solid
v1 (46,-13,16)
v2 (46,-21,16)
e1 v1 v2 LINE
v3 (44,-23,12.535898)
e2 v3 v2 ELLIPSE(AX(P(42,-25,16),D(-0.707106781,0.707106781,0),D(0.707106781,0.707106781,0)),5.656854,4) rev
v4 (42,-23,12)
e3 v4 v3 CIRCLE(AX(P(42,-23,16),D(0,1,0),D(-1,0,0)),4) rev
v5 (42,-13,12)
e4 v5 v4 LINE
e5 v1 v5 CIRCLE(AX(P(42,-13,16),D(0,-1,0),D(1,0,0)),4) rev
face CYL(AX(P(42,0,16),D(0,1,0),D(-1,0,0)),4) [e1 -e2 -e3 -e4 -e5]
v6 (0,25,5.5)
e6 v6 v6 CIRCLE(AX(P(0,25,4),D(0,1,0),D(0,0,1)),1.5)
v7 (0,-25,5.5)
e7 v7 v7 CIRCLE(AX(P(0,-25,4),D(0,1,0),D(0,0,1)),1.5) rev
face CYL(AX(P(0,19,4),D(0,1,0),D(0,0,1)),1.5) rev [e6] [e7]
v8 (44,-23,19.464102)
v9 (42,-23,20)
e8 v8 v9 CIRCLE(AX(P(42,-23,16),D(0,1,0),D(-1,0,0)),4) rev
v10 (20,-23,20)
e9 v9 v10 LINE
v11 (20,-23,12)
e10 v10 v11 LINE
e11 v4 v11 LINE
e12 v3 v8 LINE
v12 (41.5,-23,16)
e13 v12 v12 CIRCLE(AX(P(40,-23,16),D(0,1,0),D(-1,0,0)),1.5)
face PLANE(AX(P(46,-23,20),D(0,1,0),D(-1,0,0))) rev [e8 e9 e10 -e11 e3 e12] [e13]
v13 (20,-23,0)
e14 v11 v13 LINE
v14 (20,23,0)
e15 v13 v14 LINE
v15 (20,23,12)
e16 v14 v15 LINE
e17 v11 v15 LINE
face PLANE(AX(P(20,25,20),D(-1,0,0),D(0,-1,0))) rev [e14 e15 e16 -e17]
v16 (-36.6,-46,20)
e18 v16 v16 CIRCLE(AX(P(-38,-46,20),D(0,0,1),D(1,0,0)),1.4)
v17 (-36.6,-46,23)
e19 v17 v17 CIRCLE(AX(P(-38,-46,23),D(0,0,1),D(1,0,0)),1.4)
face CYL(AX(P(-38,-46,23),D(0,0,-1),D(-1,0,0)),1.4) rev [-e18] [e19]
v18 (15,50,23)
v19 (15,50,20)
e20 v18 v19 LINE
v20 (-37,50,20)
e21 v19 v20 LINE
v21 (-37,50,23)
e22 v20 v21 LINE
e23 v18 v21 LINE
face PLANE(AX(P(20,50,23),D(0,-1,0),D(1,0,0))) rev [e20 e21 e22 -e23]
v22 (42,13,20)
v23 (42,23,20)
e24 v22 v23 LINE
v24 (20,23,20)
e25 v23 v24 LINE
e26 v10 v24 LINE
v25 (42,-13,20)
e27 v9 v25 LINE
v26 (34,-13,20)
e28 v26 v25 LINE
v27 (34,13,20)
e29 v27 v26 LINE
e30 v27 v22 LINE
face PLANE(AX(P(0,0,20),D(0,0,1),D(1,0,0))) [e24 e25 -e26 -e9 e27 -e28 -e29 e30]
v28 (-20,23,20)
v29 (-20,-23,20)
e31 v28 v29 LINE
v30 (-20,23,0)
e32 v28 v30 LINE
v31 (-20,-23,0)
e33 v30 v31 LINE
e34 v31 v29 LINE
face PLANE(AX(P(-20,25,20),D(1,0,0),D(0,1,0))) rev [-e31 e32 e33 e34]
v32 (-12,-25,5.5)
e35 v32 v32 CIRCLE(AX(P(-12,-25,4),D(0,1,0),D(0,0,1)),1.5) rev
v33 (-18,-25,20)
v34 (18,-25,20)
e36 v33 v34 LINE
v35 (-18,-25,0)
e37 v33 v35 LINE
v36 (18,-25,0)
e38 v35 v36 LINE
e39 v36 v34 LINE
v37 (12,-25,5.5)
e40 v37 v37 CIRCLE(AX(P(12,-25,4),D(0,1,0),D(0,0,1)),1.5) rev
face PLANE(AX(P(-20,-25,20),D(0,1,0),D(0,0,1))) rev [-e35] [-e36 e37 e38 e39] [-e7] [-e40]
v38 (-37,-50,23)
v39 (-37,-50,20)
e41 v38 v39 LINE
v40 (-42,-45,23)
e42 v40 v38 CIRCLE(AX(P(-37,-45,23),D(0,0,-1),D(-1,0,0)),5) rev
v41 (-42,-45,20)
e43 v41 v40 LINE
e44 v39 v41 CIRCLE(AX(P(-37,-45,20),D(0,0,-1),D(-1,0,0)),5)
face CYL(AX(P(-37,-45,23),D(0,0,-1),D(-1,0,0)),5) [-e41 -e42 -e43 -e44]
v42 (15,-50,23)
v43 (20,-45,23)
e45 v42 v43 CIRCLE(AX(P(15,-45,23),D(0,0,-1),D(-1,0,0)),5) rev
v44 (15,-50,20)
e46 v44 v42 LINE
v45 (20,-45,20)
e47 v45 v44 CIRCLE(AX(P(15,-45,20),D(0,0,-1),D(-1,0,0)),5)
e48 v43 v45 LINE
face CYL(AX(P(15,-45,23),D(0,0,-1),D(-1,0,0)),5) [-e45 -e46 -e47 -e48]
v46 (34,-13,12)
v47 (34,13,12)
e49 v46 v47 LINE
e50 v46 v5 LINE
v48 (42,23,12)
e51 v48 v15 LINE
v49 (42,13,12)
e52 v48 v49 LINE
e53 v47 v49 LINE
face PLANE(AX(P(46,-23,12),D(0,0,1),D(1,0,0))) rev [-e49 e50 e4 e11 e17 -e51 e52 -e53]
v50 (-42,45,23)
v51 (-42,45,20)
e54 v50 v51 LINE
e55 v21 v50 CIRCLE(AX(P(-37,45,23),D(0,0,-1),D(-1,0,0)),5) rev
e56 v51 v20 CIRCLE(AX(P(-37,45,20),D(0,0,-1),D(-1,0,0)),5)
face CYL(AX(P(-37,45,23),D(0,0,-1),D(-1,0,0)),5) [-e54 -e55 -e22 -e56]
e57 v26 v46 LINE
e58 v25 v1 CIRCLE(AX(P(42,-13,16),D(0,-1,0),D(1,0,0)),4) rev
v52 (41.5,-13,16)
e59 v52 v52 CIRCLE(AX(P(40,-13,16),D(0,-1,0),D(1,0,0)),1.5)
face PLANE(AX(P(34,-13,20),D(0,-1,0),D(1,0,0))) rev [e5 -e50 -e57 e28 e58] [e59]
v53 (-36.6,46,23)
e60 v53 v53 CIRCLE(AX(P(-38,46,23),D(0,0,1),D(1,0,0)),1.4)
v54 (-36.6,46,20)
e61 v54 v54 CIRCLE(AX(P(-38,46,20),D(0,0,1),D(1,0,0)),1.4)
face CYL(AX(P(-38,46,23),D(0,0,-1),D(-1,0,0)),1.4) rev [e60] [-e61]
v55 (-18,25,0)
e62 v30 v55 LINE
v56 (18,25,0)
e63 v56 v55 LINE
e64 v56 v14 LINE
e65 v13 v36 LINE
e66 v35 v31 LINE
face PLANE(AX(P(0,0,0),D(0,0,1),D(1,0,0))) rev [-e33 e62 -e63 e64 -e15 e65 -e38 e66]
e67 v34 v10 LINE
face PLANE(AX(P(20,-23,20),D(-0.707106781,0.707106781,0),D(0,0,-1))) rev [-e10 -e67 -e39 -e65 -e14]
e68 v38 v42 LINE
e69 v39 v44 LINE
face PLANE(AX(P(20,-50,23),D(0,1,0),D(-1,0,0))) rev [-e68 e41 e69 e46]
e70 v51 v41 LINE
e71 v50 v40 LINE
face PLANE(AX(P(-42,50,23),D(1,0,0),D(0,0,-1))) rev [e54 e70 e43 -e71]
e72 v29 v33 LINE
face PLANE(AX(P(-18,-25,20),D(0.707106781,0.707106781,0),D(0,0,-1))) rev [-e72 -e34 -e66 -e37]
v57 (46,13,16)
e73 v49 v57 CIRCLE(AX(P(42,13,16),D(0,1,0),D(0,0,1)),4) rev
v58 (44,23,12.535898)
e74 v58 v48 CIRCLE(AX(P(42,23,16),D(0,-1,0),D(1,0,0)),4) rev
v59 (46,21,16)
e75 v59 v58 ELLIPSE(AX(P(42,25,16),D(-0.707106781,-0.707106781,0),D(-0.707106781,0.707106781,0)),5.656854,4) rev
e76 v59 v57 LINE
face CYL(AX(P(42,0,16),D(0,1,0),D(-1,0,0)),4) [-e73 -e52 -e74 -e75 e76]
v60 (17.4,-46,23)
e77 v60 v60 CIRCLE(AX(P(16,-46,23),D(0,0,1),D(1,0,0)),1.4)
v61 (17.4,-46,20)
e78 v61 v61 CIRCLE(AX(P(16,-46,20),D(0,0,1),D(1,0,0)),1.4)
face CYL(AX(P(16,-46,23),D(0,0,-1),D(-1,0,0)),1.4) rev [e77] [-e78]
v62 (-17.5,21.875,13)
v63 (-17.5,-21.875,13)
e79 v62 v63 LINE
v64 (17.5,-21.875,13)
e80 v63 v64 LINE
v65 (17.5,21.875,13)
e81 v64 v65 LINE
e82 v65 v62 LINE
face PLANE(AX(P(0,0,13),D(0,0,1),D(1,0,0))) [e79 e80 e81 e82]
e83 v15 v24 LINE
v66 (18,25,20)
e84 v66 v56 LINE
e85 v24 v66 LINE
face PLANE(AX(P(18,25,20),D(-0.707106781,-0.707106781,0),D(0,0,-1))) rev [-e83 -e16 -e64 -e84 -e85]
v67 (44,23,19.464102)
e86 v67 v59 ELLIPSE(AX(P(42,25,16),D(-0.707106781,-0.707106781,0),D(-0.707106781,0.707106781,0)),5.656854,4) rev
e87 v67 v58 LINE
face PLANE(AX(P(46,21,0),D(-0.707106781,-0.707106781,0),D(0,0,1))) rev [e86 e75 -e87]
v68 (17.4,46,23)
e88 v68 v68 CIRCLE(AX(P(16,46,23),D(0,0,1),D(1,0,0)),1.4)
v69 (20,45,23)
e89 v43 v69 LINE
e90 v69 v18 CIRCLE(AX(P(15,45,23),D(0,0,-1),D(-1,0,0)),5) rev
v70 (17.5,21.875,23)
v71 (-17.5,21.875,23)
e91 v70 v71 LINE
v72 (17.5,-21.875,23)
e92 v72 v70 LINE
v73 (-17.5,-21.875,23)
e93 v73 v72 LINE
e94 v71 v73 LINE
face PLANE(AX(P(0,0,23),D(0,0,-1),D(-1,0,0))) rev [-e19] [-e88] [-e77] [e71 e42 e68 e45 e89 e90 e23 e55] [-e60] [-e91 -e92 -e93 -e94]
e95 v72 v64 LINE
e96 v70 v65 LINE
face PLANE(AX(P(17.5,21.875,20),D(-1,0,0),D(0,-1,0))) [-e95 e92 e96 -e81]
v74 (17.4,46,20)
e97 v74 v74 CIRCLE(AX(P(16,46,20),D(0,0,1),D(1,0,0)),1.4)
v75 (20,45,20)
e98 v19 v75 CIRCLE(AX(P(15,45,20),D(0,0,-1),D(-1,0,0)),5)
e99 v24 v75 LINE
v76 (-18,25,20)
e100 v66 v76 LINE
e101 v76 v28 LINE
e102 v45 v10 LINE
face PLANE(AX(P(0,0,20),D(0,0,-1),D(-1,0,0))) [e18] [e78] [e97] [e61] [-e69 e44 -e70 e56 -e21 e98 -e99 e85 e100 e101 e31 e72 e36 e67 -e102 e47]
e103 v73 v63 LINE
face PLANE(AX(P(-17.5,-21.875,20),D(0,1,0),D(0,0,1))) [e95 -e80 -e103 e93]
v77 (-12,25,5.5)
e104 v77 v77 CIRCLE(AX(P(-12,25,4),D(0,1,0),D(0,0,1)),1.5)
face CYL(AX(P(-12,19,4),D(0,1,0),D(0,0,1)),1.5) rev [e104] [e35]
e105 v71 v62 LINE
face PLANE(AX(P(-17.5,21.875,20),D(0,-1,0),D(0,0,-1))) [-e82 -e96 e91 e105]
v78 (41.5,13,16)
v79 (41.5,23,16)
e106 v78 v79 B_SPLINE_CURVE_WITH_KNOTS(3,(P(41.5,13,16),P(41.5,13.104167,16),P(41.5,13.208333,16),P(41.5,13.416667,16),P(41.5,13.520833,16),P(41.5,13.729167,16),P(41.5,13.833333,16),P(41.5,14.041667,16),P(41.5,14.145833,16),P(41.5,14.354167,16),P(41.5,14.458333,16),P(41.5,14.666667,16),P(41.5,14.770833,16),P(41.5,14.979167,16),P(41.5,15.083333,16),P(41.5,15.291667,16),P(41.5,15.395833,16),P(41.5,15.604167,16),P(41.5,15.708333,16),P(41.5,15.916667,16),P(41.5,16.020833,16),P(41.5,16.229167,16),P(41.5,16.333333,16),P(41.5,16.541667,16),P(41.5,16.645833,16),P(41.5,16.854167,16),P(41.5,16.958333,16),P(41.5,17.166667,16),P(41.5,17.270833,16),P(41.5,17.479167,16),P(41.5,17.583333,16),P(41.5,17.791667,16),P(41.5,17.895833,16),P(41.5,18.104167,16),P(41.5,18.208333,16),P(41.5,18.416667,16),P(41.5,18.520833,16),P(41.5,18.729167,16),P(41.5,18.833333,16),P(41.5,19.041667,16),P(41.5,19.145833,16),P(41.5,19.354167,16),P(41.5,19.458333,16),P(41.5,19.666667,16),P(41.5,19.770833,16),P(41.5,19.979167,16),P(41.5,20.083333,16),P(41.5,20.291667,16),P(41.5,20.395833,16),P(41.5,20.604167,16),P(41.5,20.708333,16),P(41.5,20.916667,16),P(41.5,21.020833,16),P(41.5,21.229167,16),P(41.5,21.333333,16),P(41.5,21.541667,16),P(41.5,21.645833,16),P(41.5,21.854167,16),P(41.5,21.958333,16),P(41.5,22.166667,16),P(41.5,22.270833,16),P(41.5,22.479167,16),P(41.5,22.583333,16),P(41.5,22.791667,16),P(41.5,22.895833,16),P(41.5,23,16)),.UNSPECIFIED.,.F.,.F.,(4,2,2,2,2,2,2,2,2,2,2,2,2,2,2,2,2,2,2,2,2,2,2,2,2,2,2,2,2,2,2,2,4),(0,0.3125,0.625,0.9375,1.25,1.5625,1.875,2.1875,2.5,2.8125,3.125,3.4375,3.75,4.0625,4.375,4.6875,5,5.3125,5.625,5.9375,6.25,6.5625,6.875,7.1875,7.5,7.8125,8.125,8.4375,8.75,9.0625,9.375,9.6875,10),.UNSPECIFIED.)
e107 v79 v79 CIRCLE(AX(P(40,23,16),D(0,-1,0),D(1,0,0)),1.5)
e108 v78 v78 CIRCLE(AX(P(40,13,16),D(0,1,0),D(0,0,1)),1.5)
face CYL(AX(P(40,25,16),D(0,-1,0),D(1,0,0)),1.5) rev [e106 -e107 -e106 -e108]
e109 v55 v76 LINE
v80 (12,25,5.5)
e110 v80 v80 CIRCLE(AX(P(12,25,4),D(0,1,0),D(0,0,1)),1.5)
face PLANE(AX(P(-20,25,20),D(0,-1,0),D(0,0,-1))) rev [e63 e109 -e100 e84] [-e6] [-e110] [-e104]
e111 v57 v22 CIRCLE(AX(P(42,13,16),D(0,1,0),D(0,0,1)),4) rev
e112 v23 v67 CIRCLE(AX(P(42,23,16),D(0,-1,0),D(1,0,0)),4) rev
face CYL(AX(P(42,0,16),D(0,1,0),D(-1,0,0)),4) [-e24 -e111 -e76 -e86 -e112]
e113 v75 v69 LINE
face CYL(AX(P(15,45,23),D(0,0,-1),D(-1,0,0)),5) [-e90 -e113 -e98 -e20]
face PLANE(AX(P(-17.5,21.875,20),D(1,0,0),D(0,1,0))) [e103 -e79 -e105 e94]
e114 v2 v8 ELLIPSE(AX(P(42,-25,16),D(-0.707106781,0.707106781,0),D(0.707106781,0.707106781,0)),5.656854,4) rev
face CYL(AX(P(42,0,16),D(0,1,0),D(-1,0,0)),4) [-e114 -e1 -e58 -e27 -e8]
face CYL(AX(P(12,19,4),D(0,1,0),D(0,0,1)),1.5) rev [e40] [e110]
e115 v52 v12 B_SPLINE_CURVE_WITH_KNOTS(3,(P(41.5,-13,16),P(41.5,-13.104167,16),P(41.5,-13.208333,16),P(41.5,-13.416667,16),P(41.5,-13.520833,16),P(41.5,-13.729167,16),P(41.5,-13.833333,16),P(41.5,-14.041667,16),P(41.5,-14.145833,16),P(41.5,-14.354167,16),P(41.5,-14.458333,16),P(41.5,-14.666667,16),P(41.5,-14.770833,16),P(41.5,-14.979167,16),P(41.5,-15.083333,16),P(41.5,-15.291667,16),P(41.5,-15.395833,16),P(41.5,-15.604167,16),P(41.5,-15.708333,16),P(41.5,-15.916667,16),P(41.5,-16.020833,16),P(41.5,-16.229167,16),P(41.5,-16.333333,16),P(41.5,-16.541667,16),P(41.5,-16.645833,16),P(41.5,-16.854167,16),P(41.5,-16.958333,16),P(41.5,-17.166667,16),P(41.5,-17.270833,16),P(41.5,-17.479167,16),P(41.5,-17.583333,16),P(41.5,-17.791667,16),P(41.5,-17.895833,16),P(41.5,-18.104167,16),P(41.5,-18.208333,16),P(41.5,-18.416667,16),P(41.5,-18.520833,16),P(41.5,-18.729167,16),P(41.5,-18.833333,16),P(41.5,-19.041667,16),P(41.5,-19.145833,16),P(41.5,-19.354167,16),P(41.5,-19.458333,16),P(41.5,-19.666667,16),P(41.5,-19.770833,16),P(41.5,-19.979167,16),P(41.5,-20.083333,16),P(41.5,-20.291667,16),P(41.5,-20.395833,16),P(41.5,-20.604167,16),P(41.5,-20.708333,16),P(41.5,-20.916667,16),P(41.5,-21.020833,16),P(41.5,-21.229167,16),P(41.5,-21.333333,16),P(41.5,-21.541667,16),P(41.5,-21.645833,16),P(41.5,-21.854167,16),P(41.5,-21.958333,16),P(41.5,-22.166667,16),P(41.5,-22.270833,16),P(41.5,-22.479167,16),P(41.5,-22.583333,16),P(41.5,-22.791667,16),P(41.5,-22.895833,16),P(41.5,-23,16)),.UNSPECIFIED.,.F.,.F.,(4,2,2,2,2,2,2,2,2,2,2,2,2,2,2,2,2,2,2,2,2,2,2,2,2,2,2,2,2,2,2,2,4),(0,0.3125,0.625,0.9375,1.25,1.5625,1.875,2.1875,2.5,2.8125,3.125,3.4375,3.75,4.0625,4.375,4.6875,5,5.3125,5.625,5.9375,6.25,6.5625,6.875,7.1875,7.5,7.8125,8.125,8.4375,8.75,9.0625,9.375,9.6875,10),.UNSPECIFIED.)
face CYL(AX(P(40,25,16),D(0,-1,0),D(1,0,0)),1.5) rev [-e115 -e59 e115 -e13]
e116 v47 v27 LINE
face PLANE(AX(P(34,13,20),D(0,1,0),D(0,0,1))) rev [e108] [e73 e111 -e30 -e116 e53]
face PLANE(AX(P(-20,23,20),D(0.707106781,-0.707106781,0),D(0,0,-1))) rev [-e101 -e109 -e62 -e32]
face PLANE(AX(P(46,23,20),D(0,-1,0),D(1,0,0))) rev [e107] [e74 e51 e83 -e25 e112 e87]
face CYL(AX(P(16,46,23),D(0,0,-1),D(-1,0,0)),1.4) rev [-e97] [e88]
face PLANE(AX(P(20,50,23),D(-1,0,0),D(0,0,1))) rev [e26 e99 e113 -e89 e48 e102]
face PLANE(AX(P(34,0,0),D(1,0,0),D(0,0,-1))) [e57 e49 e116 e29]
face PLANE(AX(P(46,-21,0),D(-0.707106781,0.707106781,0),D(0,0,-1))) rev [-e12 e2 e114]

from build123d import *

# Parameters (mm, degrees)
SKETCH_1_W                      = 40
SKETCH_1_H                      = 50
SKETCH_1_W_2                    = 35
SKETCH_1_H_2                    = 43.75
EXTRUDE_1_DEPTH                 = 20
CHAMFER_1_SIZE                  = 2
SKETCH_4_R                      = 1.5
CUT_EXTRUDE_3_DEPTH             = 6
SKETCH_7_W                      = 8
SKETCH_7_H                      = 46
EXTRUDE_2_DEPTH                 = 26
SKETCH_8_W                      = 8
SKETCH_8_H                      = 26
CUT_EXTRUDE_5_DEPTH             = 12
CHAMFER_2_SIZE                  = 2
FILLET_1_R                      = 4
CUT_EXTRUDE_6_DEPTH             = 70.426219831
CUT_EXTRUDE_6_DEPTH_BACK        = 70.426219831
SKETCH_9_R                      = 1.5
SKETCH_10_W                     = 35
SKETCH_10_H                     = 43.75
EXTRUDE_4_DEPTH                 = 2
SKETCH_11_W                     = 62
SKETCH_11_H                     = 100
SKETCH_11_R                     = 1.4
SKETCH_11_W_2                   = 35
SKETCH_11_H_2                   = 43.75
EXTRUDE_5_DEPTH                 = 3
FILLET_2_R                      = 5
SKETCH_12_W                     = 35
SKETCH_12_H                     = 43.75
EXTRUDE_6_DEPTH                 = 11
CUT_EXTRUDE_4_REACH             = 92.94
SKETCH_5_R                      = 1.5
CUT_EXTRUDE_4_DIRECTION_2_DEPTH = 91.939540355


with BuildPart() as part:
    # 草图1 → 凸台-拉伸1 (new body)
    with BuildSketch(Plane.XY):
        Rectangle(SKETCH_1_W, SKETCH_1_H)
        Rectangle(SKETCH_1_W_2, SKETCH_1_H_2, mode=Mode.SUBTRACT)
    extrude(amount=EXTRUDE_1_DEPTH)

    # 倒角1
    chamfer_1_edges = [part.edges().sort_by_distance(p)[0] for p in [
        (20, -25, 10),
        (-20, -25, 10),
        (-20, 25, 10),
        (20, 25, 10),
    ]]
    chamfer(chamfer_1_edges, length=CHAMFER_1_SIZE)

    # 草图4 → 切除-拉伸3 (cut)
    with BuildSketch(Plane(origin=(0, 25, 0), x_dir=(1, 0, 0), z_dir=(0, 1, 0))):
        with Locations(Location((-12, -4, 0), (0, 0, 270))):
            Circle(SKETCH_4_R)
        with Locations(Location((0, -4, 0), (0, 0, 270))):
            Circle(SKETCH_4_R)
        with Locations(Location((12, -4, 0), (0, 0, 270))):
            Circle(SKETCH_4_R)
    extrude(amount=-CUT_EXTRUDE_3_DEPTH, mode=Mode.SUBTRACT)

    # 草图7 → 凸台-拉伸2 (add)
    with BuildSketch(Plane(origin=(20, 0, 0), x_dir=(0, 0, -1), z_dir=(1, 0, 0))):
        with Locations((-16, 0)):
            Rectangle(SKETCH_7_W, SKETCH_7_H)
    extrude(amount=EXTRUDE_2_DEPTH)

    # 草图8 → 切除-拉伸5 (cut)
    with BuildSketch(Plane(origin=(46, 0, 0), x_dir=(0, 0, -1), z_dir=(1, 0, 0))):
        with Locations((-16, 0)):
            Rectangle(SKETCH_8_W, SKETCH_8_H)
    extrude(amount=-CUT_EXTRUDE_5_DEPTH, mode=Mode.SUBTRACT)

    # 倒角2
    chamfer_2_edges = [part.edges().sort_by_distance(p)[0] for p in [
        (46, -23, 16),
        (46, 23, 16),
    ]]
    chamfer(chamfer_2_edges, length=CHAMFER_2_SIZE)

    # 圆角1
    fillet_1_edges = [part.edges().sort_by_distance(p)[0] for p in [
        (46, -17, 12),
        (46, -17, 20),
        (46, 17, 12),
        (46, 17, 20),
    ]]
    fillet(fillet_1_edges, radius=FILLET_1_R - 0.0001)  # a hair under: the kernel refuses the full size

    # 草图9 → 切除-拉伸6 (cut, two sides: drawn at the far end of the back side and taken through both)
    with BuildSketch(Plane.XZ.offset(23).offset(-CUT_EXTRUDE_6_DEPTH_BACK)):
        with Locations((40, 16)):
            Circle(SKETCH_9_R)
    extrude(amount=CUT_EXTRUDE_6_DEPTH + CUT_EXTRUDE_6_DEPTH_BACK, mode=Mode.SUBTRACT)

    # 草图10 → 凸台-拉伸4 (add)
    with BuildSketch(Plane(origin=(0, 0, 0), x_dir=(-1, 0, 0), z_dir=(0, 0, -1))):
        Rectangle(SKETCH_10_W, SKETCH_10_H)
    extrude(amount=-EXTRUDE_4_DEPTH)

    # 草图11 → 凸台-拉伸5 (add)
    with BuildSketch(Plane.XY.offset(20)):
        with Locations((-11, 0)):
            Rectangle(SKETCH_11_W, SKETCH_11_H)
        with Locations((-38, 46)):
            Circle(SKETCH_11_R, mode=Mode.SUBTRACT)
        with Locations((16, 46)):
            Circle(SKETCH_11_R, mode=Mode.SUBTRACT)
        with Locations((-38, -46)):
            Circle(SKETCH_11_R, mode=Mode.SUBTRACT)
        with Locations((16, -46)):
            Circle(SKETCH_11_R, mode=Mode.SUBTRACT)
        Rectangle(SKETCH_11_W_2, SKETCH_11_H_2, mode=Mode.SUBTRACT)
    extrude(amount=EXTRUDE_5_DEPTH)

    # 圆角2
    fillet_2_edges = [part.edges().sort_by_distance(p)[0] for p in [
        (20, -50, 21.5),
        (20, 50, 21.5),
        (-42, 50, 21.5),
        (-42, -50, 21.5),
    ]]
    fillet(fillet_2_edges, radius=FILLET_2_R)

    # 草图12 → 凸台-拉伸6 (add)
    with BuildSketch(Plane.XY.offset(2)):
        Rectangle(SKETCH_12_W, SKETCH_12_H)
    extrude(amount=EXTRUDE_6_DEPTH)

    # 草图5 → 切除-拉伸4 (cut, up to next)
    with BuildSketch(Plane.XZ.offset(25), mode=Mode.PRIVATE) as cut_extrude_4_sk1:
        with Locations(Location((-12, 4, 0), (0, 0, 90))):
            Circle(SKETCH_5_R)
    cut_extrude_4_tool1 = extrude(cut_extrude_4_sk1.sketch, amount=-CUT_EXTRUDE_4_REACH, mode=Mode.PRIVATE) & part.part
    # 草图5 → 切除-拉伸4 (cut, up to next)
    with BuildSketch(Plane.XZ.offset(25), mode=Mode.PRIVATE) as cut_extrude_4_sk2:
        with Locations(Location((0, 4, 0), (0, 0, 90))):
            Circle(SKETCH_5_R)
    cut_extrude_4_tool2 = extrude(cut_extrude_4_sk2.sketch, amount=-CUT_EXTRUDE_4_REACH, mode=Mode.PRIVATE) & part.part
    # 草图5 → 切除-拉伸4 (cut, up to next)
    with BuildSketch(Plane.XZ.offset(25), mode=Mode.PRIVATE) as cut_extrude_4_sk3:
        with Locations(Location((12, 4, 0), (0, 0, 90))):
            Circle(SKETCH_5_R)
    cut_extrude_4_tool3 = extrude(cut_extrude_4_sk3.sketch, amount=-CUT_EXTRUDE_4_REACH, mode=Mode.PRIVATE) & part.part
    add(cut_extrude_4_tool1.solids().sort_by_distance((-12, -25, 4))[0], mode=Mode.SUBTRACT)
    add(cut_extrude_4_tool2.solids().sort_by_distance((0, -25, 4))[0], mode=Mode.SUBTRACT)
    add(cut_extrude_4_tool3.solids().sort_by_distance((12, -25, 4))[0], mode=Mode.SUBTRACT)

    # 草图5 → 切除-拉伸4 direction 2 (cut)
    with BuildSketch(Plane.XZ.offset(25)):
        with Locations(Location((-12, 4, 0), (0, 0, 90))):
            Circle(SKETCH_5_R)
        with Locations(Location((0, 4, 0), (0, 0, 90))):
            Circle(SKETCH_5_R)
        with Locations(Location((12, 4, 0), (0, 0, 90))):
            Circle(SKETCH_5_R)
    extrude(amount=CUT_EXTRUDE_4_DIRECTION_2_DEPTH, mode=Mode.SUBTRACT)


solid = part.part
